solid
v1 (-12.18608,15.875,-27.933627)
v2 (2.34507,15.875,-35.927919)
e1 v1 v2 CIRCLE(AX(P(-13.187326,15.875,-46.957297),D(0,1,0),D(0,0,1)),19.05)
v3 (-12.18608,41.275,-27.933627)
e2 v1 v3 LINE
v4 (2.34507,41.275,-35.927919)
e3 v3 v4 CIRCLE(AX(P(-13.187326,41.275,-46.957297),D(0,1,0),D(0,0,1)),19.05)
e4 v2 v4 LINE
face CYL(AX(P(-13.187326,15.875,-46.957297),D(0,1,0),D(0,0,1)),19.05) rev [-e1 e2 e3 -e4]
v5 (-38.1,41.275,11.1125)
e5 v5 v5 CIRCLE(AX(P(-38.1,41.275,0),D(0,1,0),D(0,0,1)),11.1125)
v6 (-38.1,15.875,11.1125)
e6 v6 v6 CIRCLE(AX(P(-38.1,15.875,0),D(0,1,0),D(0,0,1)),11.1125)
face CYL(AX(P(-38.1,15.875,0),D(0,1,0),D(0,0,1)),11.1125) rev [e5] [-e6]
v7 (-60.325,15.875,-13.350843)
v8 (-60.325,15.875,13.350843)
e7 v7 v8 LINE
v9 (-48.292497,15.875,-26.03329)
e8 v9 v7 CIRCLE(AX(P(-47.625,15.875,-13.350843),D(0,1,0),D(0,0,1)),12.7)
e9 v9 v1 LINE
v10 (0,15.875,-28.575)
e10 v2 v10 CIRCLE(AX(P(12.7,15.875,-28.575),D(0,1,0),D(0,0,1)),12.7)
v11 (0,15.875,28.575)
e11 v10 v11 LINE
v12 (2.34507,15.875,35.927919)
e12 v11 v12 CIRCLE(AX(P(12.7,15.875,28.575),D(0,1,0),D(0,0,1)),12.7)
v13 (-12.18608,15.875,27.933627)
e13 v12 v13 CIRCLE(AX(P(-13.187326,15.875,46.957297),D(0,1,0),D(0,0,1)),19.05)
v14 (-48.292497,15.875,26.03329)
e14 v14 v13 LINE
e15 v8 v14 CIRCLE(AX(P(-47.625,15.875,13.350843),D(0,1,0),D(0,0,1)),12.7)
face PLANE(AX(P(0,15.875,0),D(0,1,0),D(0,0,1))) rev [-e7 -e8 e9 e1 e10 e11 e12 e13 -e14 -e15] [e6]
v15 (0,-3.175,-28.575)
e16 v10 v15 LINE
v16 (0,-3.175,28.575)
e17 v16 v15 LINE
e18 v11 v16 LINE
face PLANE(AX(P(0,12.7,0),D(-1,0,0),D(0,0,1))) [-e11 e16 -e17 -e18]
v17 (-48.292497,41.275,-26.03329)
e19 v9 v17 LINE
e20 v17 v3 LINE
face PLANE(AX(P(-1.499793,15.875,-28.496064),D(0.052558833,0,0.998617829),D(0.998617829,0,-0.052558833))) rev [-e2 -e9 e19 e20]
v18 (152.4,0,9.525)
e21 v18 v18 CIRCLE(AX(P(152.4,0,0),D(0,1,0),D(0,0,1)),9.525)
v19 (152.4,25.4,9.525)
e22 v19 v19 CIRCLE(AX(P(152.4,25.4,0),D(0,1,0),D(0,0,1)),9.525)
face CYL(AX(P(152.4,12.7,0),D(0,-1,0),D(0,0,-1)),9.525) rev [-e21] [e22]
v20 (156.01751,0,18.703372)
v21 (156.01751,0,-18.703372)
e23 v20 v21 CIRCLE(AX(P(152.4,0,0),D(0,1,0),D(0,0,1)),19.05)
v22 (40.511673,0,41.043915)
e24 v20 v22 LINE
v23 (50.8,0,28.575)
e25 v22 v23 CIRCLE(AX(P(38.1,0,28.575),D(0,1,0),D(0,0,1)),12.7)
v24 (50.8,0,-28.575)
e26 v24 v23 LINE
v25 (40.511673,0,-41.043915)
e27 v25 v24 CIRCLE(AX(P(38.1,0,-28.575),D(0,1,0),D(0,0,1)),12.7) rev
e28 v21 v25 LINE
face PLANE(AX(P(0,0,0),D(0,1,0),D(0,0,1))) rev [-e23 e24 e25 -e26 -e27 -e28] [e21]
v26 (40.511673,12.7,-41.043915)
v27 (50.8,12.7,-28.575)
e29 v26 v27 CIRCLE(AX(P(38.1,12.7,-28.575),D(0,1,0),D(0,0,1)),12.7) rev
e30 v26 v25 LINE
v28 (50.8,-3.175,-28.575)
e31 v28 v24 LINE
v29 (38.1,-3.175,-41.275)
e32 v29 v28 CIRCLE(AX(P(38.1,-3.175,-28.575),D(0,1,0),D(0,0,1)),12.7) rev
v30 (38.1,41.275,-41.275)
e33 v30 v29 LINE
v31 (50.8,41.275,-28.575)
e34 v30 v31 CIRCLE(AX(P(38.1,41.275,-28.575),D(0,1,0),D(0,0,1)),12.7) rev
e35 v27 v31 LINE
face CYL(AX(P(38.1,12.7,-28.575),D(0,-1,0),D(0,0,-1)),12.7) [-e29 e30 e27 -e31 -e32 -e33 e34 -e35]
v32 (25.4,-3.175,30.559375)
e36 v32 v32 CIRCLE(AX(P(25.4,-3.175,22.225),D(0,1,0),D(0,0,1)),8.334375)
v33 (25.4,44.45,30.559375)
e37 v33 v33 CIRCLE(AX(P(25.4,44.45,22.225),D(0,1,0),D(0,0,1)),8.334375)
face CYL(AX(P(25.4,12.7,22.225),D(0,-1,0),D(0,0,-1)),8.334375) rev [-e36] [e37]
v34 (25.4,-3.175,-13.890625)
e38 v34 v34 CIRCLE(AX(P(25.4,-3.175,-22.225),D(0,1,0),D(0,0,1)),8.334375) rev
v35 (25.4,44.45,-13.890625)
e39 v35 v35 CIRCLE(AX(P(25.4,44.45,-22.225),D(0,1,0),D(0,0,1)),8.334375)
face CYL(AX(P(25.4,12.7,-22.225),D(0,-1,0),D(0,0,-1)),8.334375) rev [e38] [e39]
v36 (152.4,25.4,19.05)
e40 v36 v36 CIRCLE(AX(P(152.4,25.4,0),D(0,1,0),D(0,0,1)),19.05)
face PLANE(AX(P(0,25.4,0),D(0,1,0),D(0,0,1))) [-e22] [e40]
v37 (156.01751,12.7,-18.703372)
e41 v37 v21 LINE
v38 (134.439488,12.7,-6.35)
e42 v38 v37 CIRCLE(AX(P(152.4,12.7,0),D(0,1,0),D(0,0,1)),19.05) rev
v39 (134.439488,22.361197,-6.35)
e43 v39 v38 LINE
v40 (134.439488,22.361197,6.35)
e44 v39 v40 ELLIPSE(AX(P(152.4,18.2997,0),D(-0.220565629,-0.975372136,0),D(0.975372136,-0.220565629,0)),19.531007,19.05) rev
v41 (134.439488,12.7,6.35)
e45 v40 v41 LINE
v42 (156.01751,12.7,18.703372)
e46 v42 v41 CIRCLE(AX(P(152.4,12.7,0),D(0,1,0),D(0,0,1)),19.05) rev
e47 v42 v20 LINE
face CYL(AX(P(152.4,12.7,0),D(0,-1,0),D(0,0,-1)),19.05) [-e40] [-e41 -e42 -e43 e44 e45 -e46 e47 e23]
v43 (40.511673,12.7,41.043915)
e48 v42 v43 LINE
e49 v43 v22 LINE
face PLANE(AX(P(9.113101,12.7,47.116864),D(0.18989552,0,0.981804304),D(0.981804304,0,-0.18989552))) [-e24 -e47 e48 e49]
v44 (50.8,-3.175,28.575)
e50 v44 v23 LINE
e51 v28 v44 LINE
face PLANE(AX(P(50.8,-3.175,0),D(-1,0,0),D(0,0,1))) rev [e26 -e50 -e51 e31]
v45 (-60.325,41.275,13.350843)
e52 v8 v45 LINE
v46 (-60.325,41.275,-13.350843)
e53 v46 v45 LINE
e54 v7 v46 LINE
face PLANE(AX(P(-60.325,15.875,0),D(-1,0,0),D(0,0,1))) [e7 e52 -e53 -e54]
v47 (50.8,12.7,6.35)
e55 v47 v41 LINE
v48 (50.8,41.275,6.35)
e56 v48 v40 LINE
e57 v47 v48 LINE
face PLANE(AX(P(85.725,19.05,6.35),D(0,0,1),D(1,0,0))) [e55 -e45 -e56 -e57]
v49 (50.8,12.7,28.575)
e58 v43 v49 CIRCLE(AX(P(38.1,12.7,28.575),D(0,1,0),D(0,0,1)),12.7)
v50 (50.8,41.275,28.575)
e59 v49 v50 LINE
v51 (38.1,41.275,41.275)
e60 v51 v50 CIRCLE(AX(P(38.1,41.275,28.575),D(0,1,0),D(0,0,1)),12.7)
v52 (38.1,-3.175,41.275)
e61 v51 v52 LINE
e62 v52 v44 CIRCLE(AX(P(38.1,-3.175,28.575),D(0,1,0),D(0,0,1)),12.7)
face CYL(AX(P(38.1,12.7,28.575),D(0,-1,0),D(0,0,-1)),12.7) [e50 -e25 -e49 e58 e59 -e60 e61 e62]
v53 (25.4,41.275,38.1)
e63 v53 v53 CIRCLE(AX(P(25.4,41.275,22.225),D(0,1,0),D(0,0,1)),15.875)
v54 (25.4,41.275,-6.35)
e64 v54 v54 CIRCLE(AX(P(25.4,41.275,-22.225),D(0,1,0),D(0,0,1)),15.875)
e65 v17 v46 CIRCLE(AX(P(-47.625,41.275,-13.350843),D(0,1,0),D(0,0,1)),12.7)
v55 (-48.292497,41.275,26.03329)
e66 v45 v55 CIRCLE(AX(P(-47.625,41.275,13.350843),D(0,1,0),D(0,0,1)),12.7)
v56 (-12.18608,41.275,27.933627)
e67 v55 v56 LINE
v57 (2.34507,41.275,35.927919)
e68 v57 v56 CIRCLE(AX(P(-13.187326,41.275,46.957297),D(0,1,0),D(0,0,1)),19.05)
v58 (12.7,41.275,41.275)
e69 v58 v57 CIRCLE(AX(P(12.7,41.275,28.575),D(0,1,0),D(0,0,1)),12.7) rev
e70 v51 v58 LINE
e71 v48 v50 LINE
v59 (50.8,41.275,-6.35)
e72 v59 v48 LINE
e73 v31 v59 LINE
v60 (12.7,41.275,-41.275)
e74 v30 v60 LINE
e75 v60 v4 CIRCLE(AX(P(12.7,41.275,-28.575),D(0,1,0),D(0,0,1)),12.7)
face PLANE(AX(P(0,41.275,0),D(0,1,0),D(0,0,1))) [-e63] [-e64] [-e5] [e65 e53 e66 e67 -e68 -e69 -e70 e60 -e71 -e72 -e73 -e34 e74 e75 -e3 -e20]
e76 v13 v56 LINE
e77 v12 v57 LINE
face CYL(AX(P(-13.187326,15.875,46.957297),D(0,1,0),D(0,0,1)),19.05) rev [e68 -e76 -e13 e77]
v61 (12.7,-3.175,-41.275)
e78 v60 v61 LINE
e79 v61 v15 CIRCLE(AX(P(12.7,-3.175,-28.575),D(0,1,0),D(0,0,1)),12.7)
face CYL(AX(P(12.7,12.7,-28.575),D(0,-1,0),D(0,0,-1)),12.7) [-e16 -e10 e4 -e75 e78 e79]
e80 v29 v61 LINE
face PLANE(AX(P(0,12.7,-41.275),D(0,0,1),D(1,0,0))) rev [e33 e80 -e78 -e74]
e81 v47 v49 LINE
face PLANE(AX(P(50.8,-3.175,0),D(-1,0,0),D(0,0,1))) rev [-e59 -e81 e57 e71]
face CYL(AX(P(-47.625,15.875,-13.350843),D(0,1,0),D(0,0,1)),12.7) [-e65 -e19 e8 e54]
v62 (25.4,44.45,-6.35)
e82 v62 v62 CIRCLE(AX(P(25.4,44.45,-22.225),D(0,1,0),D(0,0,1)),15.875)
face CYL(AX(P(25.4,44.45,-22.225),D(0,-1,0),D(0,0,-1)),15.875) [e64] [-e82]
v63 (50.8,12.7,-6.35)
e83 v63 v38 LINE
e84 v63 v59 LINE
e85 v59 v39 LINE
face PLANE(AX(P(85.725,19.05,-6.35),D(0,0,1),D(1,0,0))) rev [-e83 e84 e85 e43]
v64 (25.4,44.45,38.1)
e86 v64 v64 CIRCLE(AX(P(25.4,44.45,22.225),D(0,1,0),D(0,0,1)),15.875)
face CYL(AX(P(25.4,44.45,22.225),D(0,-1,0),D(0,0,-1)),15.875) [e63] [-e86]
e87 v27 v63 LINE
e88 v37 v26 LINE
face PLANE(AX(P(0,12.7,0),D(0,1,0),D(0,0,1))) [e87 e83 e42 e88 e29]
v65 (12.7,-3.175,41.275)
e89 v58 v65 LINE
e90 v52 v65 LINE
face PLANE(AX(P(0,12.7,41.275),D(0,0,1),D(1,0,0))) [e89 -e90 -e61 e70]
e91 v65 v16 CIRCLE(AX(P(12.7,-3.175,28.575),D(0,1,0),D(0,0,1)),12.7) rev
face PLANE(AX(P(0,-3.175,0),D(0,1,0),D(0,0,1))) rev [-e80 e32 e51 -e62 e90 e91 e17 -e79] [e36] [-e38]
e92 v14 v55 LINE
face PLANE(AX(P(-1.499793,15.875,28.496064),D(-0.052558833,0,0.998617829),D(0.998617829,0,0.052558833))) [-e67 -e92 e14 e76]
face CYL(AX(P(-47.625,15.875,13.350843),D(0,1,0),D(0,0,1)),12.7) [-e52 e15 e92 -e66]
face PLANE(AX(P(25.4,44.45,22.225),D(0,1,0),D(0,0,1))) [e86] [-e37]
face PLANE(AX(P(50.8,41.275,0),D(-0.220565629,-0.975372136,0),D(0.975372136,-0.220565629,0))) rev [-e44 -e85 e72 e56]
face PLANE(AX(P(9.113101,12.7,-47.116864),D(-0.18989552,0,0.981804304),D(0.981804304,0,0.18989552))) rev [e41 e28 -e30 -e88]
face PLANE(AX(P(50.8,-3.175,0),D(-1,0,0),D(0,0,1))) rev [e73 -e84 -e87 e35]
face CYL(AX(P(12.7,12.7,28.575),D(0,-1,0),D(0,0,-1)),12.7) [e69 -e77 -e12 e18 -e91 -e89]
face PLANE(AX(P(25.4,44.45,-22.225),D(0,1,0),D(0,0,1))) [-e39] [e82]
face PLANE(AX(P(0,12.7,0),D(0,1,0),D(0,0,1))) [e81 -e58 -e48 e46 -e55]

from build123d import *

# Parameters (mm, degrees)
SKETCH1_R                = 8.334375
SKETCH1_R_2              = 19.05
SKETCH1_R_3              = 9.525
SKETCH1_R_4              = 15.875
BOSS_EXTRUDE3_DEPTH      = 12.7
BOSS_EXTRUDE4_DEPTH      = 41.275
BOSS_EXTRUDE4_DEPTH_BACK = 3.175
SKETCH1_5_R              = 8.334375
SKETCH1_5_R_2            = 15.875
SKETCH1_6_R              = 19.05
SKETCH1_6_R_2            = 9.525
BOSS_EXTRUDE5_DEPTH      = 25.4
RIB1_START               = -6.35
RIB1_DEPTH               = 12.7
BOSS_EXTRUDE6_START      = 41.275
SKETCH1_7_R              = 15.875
SKETCH1_7_R_2            = 8.334375
BOSS_EXTRUDE6_DEPTH      = 3.175
BOSS_EXTRUDE8_START      = -25.4
SKETCH4_R                = 11.1125
BOSS_EXTRUDE8_DEPTH      = 25.4


# Read off the part's stored shape, not the designer's step: Rib1
with BuildPart() as part:
    # Sketch1 → Boss-Extrude3 (new body)
    # profile 1 of 5: a face of its own
    with BuildSketch(Plane(origin=(0, 0, 0), x_dir=(1, 0, 0), z_dir=(0, 1, 0))):
        with BuildLine():
            ThreePointArc((40.51167311, 41.043914661), (47.895872817, 36.657751744), (50.8, 28.575))
            Line((50.8, 28.575), (50.8, -28.575))
            ThreePointArc((50.8, -28.575), (47.895872817, -36.657751744), (40.51167311, -41.043914661))
            Line((40.51167311, -41.043914661), (156.017509664, -18.703371991))
            ThreePointArc((156.017509664, -18.703371991), (133.35, 0), (156.017509664, 18.703371991))
            Line((156.017509664, 18.703371991), (40.51167311, 41.043914661))
        make_face()
    # profile 2 of 5: a face of its own
    with BuildSketch(Plane(origin=(0, 0, 0), x_dir=(1, 0, 0), z_dir=(0, 1, 0))):
        with BuildLine():
            ThreePointArc((38.1, 41.275), (47.080256121, 37.555256121), (50.8, 28.575))
            Line((50.8, 28.575), (50.8, -28.575))
            ThreePointArc((50.8, -28.575), (47.080256121, -37.555256121), (38.1, -41.275))
            Line((38.1, -41.275), (12.7, -41.275))
            ThreePointArc((12.7, -41.275), (3.719743879, -37.555256121), (0, -28.575))
            Line((0, -28.575), (0, 28.575))
            ThreePointArc((0, 28.575), (3.719743879, 37.555256121), (12.7, 41.275))
            Line((12.7, 41.275), (38.1, 41.275))
        make_face()
        with Locations(Location((25.4, -22.225, 0), (0, 0, 270))):
            Circle(SKETCH1_R, mode=Mode.SUBTRACT)
        with Locations(Location((25.4, 22.225, 0), (0, 0, 270))):
            Circle(SKETCH1_R, mode=Mode.SUBTRACT)
    # profile 3 of 5: a face of its own
    with BuildSketch(Plane(origin=(0, 0, 0), x_dir=(1, 0, 0), z_dir=(0, 1, 0))):
        with Locations((152.4, 0)):
            Circle(SKETCH1_R_2)
        with Locations(Location((152.4, 0, 0), (0, 0, 270))):
            Circle(SKETCH1_R_3, mode=Mode.SUBTRACT)
    # profile 4 of 5: a face of its own
    with BuildSketch(Plane(origin=(0, 0, 0), x_dir=(1, 0, 0), z_dir=(0, 1, 0))):
        with Locations((25.4, 22.225)):
            Circle(SKETCH1_R_4)
        with Locations(Location((25.4, 22.225, 0), (0, 0, 270))):
            Circle(SKETCH1_R, mode=Mode.SUBTRACT)
    # profile 5 of 5: a face of its own
    with BuildSketch(Plane(origin=(0, 0, 0), x_dir=(1, 0, 0), z_dir=(0, 1, 0))):
        with Locations((25.4, -22.225)):
            Circle(SKETCH1_R_4)
        with Locations(Location((25.4, -22.225, 0), (0, 0, 270))):
            Circle(SKETCH1_R, mode=Mode.SUBTRACT)
    extrude(amount=BOSS_EXTRUDE3_DEPTH)

    # Sketch1<5> → Boss-Extrude4 (add, two sides: drawn at the far end of the back side and taken through both)
    # profile 1 of 3: a face of its own
    with BuildSketch(Plane(origin=(0, 0, 0), x_dir=(1, 0, 0), z_dir=(0, 1, 0)).offset(-BOSS_EXTRUDE4_DEPTH_BACK)):
        with BuildLine():
            ThreePointArc((38.1, 41.275), (47.080256121, 37.555256121), (50.8, 28.575))
            Line((50.8, 28.575), (50.8, -28.575))
            ThreePointArc((50.8, -28.575), (47.080256121, -37.555256121), (38.1, -41.275))
            Line((38.1, -41.275), (12.7, -41.275))
            ThreePointArc((12.7, -41.275), (3.719743879, -37.555256121), (0, -28.575))
            Line((0, -28.575), (0, 28.575))
            ThreePointArc((0, 28.575), (3.719743879, 37.555256121), (12.7, 41.275))
            Line((12.7, 41.275), (38.1, 41.275))
        make_face()
        with Locations(Location((25.4, -22.225, 0), (0, 0, 270))):
            Circle(SKETCH1_5_R, mode=Mode.SUBTRACT)
        with Locations(Location((25.4, 22.225, 0), (0, 0, 270))):
            Circle(SKETCH1_5_R, mode=Mode.SUBTRACT)
    # profile 2 of 3: a face of its own
    with BuildSketch(Plane(origin=(0, 0, 0), x_dir=(1, 0, 0), z_dir=(0, 1, 0)).offset(-BOSS_EXTRUDE4_DEPTH_BACK)):
        with Locations((25.4, -22.225)):
            Circle(SKETCH1_5_R_2)
        with Locations(Location((25.4, -22.225, 0), (0, 0, 270))):
            Circle(SKETCH1_5_R, mode=Mode.SUBTRACT)
    # profile 3 of 3: a face of its own
    with BuildSketch(Plane(origin=(0, 0, 0), x_dir=(1, 0, 0), z_dir=(0, 1, 0)).offset(-BOSS_EXTRUDE4_DEPTH_BACK)):
        with Locations((25.4, 22.225)):
            Circle(SKETCH1_5_R_2)
        with Locations(Location((25.4, 22.225, 0), (0, 0, 270))):
            Circle(SKETCH1_5_R, mode=Mode.SUBTRACT)
    extrude(amount=BOSS_EXTRUDE4_DEPTH + BOSS_EXTRUDE4_DEPTH_BACK)

    # Sketch1<6> → Boss-Extrude5 (add)
    with BuildSketch(Plane(origin=(0, 0, 0), x_dir=(1, 0, 0), z_dir=(0, 1, 0))):
        with Locations(Location((152.4, 0, 0), (0, 0, 79.053313044))):
            Circle(SKETCH1_6_R)
        with Locations(Location((152.4, 0, 0), (0, 0, 270))):
            Circle(SKETCH1_6_R_2, mode=Mode.SUBTRACT)
    extrude(amount=BOSS_EXTRUDE5_DEPTH)

    # Rib1 outline → Rib1 (add)
    with BuildSketch(Plane.XY.offset(RIB1_START)):
        Polygon((134.439487758, 22.361197239), (50.8, 41.275), (50.8, 12.7), (136, 12.7), (136, 22.008311042), align=None)
    extrude(amount=RIB1_DEPTH)

    # Sketch1<7> → Boss-Extrude6 (add)
    # profile 1 of 2: a face of its own
    with BuildSketch(Plane(origin=(0, 0, 0), x_dir=(1, 0, 0), z_dir=(0, 1, 0)).offset(BOSS_EXTRUDE6_START)):
        with Locations(Location((25.4, -22.225, 0), (0, 0, 270))):
            Circle(SKETCH1_7_R)
        with Locations(Location((25.4, -22.225, 0), (0, 0, 270))):
            Circle(SKETCH1_7_R_2, mode=Mode.SUBTRACT)
    # profile 2 of 2: a face of its own
    with BuildSketch(Plane(origin=(0, 0, 0), x_dir=(1, 0, 0), z_dir=(0, 1, 0)).offset(BOSS_EXTRUDE6_START)):
        with Locations(Location((25.4, 22.225, 0), (0, 0, 270))):
            Circle(SKETCH1_7_R)
        with Locations(Location((25.4, 22.225, 0), (0, 0, 270))):
            Circle(SKETCH1_7_R_2, mode=Mode.SUBTRACT)
    extrude(amount=BOSS_EXTRUDE6_DEPTH)

    # Sketch4 → Boss-Extrude8 (add)
    with BuildSketch(Plane(origin=(0, 41.275, 0), x_dir=(1, 0, 0), z_dir=(0, 1, 0)).offset(BOSS_EXTRUDE8_START)):
        with BuildLine():
            ThreePointArc((0, 28.575), (0.600462467, 32.43391066), (2.345069525, 35.927918798))
            ThreePointArc((2.345069525, 35.927918798), (-4.004870137, 30.266431204), (-12.186080417, 27.933627346))
            Line((-12.186080417, 27.933627346), (-48.292497181, 26.033289622))
            ThreePointArc((-48.292497181, 26.033289622), (-56.838230003, 22.091918232), (-60.325, 13.35084319))
            Line((-60.325, 13.35084319), (-60.325, -13.35084319))
            ThreePointArc((-60.325, -13.35084319), (-56.838230003, -22.091918232), (-48.292497181, -26.033289622))
            Line((-48.292497181, -26.033289622), (-12.186080417, -27.933627346))
            ThreePointArc((-12.186080417, -27.933627346), (-4.004870137, -30.266431204), (2.345069525, -35.927918798))
            ThreePointArc((2.345069525, -35.927918798), (0.600462467, -32.43391066), (0, -28.575))
            Line((0, -28.575), (0, 28.575))
        make_face()
        with Locations(Location((-38.1, 0, 0), (0, 0, 270))):
            Circle(SKETCH4_R, mode=Mode.SUBTRACT)
    extrude(amount=BOSS_EXTRUDE8_DEPTH)


solid = part.part
